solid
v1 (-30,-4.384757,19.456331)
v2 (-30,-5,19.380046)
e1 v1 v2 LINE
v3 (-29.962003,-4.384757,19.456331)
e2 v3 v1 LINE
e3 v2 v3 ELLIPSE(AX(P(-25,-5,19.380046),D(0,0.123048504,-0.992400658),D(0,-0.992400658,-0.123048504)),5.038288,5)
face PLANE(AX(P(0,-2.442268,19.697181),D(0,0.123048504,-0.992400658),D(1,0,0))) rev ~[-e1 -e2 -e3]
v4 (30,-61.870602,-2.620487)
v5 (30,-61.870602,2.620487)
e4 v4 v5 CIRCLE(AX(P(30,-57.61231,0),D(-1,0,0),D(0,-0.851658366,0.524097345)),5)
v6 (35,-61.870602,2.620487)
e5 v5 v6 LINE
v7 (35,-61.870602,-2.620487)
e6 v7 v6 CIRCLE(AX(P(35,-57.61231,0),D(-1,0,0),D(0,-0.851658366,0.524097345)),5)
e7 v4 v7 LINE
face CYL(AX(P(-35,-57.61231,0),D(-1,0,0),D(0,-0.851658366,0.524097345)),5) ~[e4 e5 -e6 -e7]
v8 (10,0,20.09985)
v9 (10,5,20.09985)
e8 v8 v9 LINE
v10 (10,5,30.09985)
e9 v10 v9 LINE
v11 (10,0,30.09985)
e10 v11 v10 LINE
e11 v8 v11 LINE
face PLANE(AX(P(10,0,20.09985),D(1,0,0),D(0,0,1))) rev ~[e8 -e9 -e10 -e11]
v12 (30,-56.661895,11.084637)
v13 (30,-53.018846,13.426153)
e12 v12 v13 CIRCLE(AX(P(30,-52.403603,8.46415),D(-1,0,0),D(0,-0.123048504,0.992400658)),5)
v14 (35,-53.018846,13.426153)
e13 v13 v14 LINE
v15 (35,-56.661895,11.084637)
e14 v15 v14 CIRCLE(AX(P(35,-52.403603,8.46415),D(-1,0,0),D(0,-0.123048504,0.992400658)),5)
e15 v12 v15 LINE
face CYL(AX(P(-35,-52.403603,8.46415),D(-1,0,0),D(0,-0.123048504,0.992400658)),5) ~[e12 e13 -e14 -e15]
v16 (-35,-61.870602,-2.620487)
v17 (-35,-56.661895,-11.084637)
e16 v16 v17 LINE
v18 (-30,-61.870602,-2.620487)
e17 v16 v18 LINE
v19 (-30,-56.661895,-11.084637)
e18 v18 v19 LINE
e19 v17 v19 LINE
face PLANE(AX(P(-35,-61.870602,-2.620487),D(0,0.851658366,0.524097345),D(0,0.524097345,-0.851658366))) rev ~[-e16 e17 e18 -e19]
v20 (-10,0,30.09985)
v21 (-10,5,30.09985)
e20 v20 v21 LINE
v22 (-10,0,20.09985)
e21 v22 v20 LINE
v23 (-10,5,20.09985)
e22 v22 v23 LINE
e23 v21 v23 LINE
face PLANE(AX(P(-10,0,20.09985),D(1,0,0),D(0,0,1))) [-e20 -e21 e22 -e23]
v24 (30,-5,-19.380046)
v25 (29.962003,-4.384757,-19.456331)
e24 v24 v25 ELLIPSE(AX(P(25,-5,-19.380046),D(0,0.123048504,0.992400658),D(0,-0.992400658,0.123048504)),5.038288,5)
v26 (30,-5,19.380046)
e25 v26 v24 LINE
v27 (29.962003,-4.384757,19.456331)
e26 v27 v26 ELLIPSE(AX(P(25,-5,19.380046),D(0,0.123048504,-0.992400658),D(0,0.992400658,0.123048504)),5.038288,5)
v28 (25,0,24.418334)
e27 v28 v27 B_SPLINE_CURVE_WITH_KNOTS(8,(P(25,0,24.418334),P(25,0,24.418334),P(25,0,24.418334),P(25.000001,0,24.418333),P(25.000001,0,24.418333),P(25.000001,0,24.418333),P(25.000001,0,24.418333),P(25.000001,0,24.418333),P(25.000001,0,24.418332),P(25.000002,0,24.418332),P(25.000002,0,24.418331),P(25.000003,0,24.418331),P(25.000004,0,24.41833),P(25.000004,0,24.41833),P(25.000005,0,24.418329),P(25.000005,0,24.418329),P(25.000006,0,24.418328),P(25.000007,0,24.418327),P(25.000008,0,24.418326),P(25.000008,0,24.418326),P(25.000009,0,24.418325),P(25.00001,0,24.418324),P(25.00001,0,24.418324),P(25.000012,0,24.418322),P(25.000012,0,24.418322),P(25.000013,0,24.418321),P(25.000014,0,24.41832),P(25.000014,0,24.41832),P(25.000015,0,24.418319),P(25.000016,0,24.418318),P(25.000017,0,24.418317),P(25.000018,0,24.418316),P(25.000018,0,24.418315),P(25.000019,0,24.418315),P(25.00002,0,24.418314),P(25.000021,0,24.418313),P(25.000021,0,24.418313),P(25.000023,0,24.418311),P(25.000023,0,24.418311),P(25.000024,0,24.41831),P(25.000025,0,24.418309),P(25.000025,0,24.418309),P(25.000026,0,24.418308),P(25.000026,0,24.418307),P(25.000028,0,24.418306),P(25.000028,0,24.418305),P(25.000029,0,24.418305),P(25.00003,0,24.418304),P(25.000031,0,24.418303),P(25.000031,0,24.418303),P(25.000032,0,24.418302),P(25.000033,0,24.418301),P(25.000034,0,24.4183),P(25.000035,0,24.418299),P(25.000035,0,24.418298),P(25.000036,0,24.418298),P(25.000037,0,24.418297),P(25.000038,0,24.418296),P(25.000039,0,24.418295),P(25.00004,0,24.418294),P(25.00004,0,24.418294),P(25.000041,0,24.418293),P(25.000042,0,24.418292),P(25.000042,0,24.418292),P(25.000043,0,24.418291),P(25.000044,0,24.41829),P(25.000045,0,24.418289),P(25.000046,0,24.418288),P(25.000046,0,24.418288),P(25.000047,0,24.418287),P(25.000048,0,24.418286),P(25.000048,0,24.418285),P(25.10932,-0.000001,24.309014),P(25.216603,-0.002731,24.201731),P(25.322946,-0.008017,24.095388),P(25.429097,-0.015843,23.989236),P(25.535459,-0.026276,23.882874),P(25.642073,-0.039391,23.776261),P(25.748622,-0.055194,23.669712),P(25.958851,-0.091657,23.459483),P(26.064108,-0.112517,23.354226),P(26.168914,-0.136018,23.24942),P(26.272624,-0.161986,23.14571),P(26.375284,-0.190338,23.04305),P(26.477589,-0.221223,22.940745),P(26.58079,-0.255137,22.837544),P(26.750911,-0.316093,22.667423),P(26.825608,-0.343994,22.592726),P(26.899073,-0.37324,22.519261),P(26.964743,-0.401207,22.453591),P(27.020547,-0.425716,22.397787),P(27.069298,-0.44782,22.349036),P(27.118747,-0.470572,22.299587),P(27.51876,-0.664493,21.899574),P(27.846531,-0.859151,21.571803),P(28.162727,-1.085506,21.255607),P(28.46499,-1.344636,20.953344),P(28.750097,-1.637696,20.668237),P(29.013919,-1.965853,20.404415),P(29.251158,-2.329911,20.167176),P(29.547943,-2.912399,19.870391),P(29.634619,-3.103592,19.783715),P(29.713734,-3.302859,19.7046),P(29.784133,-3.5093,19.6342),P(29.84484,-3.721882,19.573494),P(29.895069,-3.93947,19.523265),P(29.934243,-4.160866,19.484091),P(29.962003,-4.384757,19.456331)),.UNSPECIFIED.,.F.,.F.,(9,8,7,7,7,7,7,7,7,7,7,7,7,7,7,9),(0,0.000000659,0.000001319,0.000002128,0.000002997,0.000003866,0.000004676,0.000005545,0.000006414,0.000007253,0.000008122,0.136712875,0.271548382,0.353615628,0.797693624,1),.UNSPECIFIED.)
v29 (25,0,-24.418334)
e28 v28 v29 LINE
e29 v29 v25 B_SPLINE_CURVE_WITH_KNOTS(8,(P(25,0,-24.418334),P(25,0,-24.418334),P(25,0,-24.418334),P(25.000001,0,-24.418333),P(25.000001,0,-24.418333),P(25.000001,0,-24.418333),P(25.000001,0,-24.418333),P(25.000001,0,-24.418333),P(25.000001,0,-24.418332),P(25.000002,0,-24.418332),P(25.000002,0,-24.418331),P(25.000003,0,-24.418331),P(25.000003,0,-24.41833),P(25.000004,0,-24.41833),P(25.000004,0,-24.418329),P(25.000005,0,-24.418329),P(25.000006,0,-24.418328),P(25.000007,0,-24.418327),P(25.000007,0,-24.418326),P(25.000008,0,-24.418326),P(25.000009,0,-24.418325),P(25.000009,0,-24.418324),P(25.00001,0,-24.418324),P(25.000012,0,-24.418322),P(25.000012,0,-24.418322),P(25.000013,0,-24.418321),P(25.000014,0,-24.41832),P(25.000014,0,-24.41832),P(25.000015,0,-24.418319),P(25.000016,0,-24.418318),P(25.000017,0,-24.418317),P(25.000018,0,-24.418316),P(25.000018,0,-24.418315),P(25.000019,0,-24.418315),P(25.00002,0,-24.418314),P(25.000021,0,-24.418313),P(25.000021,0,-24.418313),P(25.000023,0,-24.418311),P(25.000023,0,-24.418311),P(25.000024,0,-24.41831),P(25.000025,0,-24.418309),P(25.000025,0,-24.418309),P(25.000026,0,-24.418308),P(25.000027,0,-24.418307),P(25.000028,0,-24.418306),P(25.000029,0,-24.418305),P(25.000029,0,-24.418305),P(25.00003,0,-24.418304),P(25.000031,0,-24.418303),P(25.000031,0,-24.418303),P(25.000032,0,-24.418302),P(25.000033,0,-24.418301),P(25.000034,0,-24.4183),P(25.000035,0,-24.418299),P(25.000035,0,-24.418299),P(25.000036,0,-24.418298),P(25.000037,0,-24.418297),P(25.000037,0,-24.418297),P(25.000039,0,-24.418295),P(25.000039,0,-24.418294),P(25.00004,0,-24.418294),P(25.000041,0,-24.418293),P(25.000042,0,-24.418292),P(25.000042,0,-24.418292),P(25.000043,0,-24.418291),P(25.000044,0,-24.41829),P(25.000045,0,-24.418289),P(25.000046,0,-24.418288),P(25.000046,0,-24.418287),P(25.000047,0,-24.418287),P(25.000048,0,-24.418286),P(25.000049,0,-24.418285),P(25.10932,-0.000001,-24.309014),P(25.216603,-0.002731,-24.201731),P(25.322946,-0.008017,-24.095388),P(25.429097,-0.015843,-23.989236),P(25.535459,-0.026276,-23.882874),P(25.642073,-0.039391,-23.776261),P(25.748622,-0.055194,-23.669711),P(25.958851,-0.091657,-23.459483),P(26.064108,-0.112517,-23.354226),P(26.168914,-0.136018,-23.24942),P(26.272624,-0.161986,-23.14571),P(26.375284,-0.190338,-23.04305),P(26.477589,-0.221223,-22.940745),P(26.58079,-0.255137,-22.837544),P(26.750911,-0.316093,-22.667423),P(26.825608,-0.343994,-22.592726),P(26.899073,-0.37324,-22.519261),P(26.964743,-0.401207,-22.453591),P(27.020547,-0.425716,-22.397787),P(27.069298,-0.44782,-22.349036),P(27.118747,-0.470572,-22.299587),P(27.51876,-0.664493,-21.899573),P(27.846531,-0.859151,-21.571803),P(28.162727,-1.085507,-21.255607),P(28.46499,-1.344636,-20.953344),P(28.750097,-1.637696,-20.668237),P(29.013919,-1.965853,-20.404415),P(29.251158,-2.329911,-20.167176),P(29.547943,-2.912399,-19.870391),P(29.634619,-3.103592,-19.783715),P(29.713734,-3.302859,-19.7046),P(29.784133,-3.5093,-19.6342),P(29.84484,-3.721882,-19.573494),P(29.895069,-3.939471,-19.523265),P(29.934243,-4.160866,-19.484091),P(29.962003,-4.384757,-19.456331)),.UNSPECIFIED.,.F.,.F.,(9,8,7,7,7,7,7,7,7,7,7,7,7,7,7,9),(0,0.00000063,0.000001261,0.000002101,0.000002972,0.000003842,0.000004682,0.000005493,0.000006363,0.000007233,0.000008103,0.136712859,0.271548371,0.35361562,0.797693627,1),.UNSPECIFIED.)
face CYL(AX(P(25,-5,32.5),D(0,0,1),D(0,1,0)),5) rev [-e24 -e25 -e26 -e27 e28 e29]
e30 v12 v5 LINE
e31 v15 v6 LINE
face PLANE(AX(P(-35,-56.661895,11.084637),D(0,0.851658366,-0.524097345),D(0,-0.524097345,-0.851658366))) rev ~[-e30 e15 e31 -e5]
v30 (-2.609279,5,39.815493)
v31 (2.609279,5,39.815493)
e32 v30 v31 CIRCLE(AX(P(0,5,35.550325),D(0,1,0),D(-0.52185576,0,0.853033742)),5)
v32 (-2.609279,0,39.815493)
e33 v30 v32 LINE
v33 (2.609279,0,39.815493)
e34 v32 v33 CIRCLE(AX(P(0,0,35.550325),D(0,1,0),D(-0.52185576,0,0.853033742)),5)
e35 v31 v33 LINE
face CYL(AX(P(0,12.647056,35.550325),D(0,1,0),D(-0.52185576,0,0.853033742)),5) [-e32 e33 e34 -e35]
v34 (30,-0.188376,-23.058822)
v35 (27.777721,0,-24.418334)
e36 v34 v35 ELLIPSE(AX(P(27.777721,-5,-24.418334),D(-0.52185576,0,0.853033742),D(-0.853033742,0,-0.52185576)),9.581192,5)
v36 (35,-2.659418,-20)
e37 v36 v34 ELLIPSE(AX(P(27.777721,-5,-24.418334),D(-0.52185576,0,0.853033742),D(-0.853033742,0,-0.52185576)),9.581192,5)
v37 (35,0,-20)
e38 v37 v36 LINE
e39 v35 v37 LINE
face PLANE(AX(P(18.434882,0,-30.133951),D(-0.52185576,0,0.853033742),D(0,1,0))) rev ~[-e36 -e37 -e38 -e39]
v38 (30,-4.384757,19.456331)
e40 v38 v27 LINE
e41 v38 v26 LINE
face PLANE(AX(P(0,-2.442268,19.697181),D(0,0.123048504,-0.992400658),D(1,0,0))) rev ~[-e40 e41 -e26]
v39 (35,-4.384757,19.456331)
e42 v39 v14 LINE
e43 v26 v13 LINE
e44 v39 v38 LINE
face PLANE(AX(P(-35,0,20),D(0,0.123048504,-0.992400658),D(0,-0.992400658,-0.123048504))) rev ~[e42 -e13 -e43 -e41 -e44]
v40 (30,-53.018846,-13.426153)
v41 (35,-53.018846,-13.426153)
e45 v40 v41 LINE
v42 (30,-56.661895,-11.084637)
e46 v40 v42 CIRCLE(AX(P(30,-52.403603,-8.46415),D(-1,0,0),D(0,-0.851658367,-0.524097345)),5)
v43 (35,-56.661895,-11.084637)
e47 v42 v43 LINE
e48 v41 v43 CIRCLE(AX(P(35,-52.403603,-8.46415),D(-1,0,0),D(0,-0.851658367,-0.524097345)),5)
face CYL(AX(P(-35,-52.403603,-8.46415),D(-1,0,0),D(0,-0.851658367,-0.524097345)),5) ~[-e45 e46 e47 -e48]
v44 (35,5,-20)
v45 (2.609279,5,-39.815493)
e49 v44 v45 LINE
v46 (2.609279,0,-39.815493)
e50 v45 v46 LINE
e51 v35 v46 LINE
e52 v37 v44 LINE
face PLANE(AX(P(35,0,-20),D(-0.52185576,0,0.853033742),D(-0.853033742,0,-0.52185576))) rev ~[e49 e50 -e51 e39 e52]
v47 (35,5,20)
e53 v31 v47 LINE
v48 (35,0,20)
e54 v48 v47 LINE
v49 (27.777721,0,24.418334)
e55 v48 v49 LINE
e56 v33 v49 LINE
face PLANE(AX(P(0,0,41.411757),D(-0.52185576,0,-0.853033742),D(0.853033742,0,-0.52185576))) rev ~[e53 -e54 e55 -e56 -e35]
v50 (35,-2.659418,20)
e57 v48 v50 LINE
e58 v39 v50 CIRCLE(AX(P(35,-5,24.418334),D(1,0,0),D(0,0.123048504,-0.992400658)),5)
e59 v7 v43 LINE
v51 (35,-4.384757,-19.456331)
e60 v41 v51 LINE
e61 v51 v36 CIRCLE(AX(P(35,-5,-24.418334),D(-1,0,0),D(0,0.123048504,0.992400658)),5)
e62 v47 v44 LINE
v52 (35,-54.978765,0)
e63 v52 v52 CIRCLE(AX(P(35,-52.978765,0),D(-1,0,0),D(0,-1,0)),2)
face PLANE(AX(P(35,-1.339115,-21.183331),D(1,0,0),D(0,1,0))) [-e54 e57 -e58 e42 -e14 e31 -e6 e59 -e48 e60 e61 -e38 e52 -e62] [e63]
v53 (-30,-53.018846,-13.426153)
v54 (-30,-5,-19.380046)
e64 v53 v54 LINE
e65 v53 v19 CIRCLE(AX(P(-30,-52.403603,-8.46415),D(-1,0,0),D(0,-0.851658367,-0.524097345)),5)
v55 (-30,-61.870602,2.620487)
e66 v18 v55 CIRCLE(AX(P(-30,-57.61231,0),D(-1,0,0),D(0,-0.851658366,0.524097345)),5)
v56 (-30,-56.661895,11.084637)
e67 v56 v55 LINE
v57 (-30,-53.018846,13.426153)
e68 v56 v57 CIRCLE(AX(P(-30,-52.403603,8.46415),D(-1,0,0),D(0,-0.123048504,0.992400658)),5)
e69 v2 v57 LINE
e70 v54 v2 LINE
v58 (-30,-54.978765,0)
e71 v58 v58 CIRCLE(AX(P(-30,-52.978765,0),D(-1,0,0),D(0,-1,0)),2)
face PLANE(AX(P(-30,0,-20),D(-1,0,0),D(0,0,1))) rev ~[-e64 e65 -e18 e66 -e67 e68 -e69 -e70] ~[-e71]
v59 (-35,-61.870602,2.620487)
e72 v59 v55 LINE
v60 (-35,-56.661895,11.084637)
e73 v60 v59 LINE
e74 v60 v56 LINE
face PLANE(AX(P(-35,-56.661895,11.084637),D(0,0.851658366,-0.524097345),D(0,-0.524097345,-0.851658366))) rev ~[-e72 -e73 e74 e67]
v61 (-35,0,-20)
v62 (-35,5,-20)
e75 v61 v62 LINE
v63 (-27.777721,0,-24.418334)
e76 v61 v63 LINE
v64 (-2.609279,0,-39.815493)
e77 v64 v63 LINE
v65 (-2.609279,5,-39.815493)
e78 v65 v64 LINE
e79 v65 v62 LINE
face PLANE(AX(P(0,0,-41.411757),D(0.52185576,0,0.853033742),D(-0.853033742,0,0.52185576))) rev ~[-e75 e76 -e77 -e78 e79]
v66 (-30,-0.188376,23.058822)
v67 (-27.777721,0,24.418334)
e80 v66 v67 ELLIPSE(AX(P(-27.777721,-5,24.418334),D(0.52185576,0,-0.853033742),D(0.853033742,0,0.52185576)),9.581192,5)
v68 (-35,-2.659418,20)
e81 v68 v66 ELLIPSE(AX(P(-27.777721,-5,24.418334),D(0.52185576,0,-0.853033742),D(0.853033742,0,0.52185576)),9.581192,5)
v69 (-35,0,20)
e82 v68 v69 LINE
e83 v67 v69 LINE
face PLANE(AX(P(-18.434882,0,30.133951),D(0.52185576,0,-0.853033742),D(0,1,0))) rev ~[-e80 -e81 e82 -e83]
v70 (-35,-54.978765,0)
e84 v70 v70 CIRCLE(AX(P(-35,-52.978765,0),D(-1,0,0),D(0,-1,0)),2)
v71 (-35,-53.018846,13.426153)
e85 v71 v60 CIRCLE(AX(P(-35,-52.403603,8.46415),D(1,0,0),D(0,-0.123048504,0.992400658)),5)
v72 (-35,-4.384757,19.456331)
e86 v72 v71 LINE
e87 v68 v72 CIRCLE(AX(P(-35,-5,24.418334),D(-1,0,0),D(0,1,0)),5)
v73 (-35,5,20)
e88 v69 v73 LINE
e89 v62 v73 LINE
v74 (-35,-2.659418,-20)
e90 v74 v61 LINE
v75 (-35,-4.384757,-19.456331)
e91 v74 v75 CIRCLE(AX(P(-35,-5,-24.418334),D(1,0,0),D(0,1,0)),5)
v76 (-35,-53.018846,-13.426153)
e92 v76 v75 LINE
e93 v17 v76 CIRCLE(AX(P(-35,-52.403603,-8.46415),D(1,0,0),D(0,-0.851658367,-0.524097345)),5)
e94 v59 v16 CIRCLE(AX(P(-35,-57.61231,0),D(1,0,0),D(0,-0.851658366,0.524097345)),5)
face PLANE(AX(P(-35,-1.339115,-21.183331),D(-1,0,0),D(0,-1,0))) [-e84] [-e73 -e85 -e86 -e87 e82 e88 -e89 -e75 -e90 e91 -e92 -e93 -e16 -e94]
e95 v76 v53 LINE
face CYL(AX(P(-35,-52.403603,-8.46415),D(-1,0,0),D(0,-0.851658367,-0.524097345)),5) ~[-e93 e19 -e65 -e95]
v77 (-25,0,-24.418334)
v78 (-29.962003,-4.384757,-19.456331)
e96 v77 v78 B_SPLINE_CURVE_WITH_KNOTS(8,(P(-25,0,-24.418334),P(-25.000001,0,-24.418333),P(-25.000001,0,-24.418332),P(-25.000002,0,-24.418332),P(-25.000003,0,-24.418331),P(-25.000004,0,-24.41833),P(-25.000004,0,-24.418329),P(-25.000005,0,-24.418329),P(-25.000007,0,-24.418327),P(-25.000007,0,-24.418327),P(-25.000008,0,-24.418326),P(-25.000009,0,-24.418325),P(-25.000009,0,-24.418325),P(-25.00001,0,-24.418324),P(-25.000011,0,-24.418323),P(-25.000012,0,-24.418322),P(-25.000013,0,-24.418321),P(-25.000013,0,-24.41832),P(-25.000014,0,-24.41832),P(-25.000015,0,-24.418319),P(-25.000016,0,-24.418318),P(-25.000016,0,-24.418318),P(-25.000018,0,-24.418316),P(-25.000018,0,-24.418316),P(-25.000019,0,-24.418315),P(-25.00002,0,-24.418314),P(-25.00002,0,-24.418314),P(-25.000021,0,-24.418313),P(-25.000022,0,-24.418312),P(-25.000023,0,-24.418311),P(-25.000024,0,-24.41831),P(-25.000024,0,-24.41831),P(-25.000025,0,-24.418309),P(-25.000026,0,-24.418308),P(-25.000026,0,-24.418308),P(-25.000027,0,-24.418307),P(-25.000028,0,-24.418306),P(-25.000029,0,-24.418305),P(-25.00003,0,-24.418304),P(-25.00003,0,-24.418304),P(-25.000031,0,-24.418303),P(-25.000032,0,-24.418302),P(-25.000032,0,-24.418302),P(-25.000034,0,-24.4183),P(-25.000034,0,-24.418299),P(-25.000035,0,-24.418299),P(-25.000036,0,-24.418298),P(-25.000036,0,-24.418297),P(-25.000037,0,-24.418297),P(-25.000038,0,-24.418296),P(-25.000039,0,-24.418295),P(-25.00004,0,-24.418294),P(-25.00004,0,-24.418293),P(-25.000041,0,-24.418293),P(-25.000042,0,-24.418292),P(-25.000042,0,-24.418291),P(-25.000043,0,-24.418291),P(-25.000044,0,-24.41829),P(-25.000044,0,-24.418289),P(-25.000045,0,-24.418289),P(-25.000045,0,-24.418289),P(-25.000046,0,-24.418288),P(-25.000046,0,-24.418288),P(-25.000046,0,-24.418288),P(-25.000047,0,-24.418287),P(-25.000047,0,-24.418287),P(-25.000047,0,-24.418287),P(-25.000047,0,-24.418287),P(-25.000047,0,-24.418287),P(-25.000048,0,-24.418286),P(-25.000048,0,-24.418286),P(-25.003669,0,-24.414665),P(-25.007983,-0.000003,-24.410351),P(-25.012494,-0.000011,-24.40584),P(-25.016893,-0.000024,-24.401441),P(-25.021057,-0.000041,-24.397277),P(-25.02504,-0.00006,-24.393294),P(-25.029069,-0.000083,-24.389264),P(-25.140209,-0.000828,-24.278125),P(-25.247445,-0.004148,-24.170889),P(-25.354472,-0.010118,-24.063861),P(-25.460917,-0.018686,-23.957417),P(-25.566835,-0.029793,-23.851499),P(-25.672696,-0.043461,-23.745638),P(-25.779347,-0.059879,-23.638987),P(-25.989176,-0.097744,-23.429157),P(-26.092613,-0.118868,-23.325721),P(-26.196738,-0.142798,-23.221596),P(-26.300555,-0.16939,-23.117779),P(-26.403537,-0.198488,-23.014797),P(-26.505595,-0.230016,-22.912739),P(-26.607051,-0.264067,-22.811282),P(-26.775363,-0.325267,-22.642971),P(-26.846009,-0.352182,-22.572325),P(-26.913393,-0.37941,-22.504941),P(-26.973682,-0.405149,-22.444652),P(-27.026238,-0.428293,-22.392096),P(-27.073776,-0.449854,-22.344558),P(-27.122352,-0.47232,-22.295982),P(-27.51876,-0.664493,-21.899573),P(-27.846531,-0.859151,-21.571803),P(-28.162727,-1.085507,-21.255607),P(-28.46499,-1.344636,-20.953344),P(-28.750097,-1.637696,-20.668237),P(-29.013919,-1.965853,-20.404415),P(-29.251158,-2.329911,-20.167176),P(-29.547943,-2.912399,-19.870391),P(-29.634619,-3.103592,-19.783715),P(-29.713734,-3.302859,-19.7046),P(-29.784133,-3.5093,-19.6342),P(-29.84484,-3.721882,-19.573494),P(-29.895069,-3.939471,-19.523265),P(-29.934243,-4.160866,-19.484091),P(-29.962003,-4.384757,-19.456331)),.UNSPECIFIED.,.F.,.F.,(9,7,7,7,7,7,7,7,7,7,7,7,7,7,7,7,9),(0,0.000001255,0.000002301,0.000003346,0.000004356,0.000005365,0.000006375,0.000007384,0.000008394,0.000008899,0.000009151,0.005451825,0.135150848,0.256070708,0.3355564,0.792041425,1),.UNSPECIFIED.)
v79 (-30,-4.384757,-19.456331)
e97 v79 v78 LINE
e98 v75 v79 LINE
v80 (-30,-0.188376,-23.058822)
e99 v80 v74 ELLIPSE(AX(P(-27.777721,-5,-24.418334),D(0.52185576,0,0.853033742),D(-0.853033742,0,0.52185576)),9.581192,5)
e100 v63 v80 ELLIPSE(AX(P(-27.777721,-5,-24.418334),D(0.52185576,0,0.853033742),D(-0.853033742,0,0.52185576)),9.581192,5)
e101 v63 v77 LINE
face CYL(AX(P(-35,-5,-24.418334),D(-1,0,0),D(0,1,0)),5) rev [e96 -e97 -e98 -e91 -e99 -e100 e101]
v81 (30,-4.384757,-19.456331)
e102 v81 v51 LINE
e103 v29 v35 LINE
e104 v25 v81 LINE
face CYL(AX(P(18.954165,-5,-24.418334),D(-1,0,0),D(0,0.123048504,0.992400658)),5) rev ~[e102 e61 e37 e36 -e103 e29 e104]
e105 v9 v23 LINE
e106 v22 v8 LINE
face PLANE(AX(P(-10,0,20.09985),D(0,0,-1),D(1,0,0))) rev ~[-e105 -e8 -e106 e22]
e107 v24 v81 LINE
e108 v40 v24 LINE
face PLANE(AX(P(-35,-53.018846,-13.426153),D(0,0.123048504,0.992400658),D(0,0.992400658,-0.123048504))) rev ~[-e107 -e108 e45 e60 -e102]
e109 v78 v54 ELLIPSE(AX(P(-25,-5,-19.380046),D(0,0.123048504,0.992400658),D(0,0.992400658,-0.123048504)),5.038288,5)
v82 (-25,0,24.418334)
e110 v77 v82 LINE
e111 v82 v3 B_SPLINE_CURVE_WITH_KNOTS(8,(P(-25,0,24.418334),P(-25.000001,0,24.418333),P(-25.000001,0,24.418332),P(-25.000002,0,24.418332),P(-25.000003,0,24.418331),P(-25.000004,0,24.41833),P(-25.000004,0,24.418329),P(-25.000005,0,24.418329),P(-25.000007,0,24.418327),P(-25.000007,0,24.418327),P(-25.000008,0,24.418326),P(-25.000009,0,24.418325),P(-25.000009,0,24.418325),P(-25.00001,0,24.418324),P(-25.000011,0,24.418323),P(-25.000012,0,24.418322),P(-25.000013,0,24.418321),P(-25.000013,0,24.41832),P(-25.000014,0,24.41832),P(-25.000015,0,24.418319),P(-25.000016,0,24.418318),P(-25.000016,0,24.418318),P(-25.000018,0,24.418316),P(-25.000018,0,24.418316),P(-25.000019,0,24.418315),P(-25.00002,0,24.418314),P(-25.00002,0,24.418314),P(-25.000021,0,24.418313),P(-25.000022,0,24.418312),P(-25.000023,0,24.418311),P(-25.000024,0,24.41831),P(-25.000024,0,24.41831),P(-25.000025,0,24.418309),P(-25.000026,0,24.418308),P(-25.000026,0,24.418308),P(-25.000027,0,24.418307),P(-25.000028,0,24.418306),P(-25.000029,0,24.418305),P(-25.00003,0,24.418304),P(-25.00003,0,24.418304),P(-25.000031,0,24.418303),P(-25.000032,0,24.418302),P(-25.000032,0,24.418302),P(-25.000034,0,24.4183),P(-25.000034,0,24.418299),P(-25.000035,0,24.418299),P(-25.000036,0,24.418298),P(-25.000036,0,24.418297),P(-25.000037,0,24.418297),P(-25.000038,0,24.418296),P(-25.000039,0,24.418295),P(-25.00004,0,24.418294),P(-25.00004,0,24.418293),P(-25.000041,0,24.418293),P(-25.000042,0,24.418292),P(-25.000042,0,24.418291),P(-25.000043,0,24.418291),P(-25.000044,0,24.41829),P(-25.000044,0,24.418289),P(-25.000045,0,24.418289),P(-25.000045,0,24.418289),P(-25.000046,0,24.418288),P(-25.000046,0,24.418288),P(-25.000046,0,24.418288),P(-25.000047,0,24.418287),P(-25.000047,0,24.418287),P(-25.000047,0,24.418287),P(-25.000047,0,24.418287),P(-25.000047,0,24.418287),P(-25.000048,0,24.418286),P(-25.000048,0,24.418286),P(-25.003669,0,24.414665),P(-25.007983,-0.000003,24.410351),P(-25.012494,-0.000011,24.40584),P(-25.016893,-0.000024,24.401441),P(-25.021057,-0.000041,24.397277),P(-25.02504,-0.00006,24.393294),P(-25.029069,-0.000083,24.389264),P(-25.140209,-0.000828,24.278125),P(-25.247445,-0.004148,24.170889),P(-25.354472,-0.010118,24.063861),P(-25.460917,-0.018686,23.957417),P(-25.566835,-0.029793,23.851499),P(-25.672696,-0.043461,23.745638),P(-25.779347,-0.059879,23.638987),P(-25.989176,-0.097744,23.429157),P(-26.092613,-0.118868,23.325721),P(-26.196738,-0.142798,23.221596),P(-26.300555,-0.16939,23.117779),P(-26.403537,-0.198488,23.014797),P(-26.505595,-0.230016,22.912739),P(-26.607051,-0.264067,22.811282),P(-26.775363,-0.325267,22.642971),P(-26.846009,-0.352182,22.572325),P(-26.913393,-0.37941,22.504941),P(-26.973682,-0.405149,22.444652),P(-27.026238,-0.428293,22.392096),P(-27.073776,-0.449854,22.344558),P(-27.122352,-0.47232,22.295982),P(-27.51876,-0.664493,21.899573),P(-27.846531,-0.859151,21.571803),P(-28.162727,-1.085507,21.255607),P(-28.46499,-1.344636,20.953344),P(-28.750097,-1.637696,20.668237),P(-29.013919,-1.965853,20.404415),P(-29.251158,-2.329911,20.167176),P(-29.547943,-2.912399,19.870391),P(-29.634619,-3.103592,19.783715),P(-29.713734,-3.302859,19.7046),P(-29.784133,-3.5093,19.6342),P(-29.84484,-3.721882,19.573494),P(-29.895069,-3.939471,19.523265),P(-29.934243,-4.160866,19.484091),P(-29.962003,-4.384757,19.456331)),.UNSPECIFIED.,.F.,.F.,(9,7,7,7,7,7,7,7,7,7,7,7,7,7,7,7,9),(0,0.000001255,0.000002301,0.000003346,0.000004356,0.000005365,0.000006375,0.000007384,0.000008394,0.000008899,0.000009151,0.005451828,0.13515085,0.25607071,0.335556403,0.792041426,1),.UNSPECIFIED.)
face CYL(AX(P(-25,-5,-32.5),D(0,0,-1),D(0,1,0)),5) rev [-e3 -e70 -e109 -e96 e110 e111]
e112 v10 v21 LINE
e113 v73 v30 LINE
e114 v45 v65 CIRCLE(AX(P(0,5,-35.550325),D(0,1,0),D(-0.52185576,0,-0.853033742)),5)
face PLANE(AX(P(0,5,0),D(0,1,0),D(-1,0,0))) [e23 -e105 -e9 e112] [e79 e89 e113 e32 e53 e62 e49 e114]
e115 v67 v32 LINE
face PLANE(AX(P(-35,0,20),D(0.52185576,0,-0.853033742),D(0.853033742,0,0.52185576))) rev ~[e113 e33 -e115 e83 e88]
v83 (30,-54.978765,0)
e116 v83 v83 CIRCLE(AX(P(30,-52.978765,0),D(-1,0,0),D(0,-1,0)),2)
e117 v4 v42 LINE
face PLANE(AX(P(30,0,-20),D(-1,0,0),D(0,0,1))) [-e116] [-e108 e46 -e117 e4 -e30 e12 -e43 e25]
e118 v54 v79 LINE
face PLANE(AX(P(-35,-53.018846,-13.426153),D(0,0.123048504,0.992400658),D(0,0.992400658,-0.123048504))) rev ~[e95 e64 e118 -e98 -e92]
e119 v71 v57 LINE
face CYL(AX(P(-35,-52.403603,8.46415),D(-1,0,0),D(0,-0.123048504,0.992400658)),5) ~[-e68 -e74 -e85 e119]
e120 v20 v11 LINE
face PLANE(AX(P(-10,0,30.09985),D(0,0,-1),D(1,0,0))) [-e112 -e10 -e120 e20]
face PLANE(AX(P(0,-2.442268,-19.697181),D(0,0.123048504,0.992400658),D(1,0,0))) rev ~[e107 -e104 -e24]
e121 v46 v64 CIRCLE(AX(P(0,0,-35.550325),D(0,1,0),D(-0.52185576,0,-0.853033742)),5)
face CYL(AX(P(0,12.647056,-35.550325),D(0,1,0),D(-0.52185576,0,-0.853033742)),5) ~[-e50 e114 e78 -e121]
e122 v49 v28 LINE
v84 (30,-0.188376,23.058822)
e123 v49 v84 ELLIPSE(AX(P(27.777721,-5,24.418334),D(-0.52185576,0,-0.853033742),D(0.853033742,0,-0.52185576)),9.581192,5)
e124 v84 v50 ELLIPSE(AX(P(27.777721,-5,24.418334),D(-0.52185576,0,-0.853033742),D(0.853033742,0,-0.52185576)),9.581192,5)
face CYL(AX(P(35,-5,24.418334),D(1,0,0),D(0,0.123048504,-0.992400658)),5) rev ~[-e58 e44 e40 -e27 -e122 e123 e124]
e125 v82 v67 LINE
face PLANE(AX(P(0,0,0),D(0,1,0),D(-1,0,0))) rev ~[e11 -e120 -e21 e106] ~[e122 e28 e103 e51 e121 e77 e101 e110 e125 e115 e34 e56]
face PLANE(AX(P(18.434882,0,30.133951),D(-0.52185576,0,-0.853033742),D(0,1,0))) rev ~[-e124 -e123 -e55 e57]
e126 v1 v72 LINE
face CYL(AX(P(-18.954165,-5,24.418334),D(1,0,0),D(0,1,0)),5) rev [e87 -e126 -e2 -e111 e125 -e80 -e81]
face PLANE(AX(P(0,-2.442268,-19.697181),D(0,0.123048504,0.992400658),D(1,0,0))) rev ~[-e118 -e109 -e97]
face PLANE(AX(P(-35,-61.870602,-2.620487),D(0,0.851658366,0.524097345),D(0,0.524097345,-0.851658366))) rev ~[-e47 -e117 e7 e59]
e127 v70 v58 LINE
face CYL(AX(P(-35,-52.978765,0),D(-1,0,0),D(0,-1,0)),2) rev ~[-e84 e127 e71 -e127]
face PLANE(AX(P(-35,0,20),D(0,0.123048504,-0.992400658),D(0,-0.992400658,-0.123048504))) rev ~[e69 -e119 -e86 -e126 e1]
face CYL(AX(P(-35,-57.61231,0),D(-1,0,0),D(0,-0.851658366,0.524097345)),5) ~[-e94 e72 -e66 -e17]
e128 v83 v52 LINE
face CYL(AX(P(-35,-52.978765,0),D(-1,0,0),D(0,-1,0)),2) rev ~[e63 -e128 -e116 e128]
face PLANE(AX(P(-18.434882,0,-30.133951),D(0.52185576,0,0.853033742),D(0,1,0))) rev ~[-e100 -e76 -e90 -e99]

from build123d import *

# Parameters (mm, degrees)
F0_W         = 5
F0_H         = 40
F1_DEPTH     = 70
F3_DEPTH     = 5
F4_R         = 2
F5_DEPTH     = 97.2
F7_DEPTH     = 83.6
F8_T4_DEPTH  = 65
F8_T10_DEPTH = 65
F8_T16_DEPTH = 5
F8_T21_DEPTH = 5
F8_T26_DEPTH = 5
F8_T31_DEPTH = 5
F8_T37_DEPTH = 16.0458347789
F8_T42_DEPTH = 65
F8_T50_DEPTH = 16.0458347789
F8_T55_DEPTH = 65
F8_T63_DEPTH = 16.0458347789
F8_T68_DEPTH = 65
F8_T76_DEPTH = 65
F8_T81_DEPTH = 16.0458347789
F8_T85_DEPTH = 20.294112478
F9_W         = 20
F9_H         = 10
F10_DEPTH    = 25


# Not quite as in the source:
# - a fillet or chamfer that OpenCascade refuses, or shapes differently, is made with other operations: its cross-section is extruded or revolved along the edge and cut away or added


with BuildPart() as f1:
    # F0 (on Front) → F1 (new body)
    with BuildSketch(Plane.XZ):
        with Locations((-32.5, 0)):
            Rectangle(F0_W, F0_H)
    extrude(amount=F1_DEPTH)



with BuildPart() as f1b:
    # F0 (on Front) → F1, piece 2 (new body)
    with BuildSketch(Plane.XZ):
        with Locations((32.5, 0)):
            Rectangle(F0_W, F0_H)
    extrude(amount=F1_DEPTH)


with BuildPart() as f1_1:
    add(f1.part)

    add(f1b.part)  # F3 merges F1b
    # F2 (on face) → F3 (join)
    with BuildSketch(Plane(origin=(0, 0, 0), x_dir=(-1, 0, 0), z_dir=(0, 1, 0))):
        Polygon((-35, -20), (0, -41.4117574692), (35, -20), (35, 20), (0, 41.4117574692), (-35, 20), align=None)
    extrude(amount=F3_DEPTH)

    # F4 (on face) → F5 (cut)
    with BuildSketch(Plane(origin=(-35, 0, 0), x_dir=(0, -1, 0), z_dir=(-1, 0, 0))):
        with Locations((52.9787652194, 0)):
            Circle(F4_R)
    extrude(amount=-F5_DEPTH, mode=Mode.SUBTRACT)

    # F6 (on face) → F7 (cut)
    with BuildSketch(Plane(origin=(-35, 0, 0), x_dir=(0, -1, 0), z_dir=(-1, 0, 0))):
        with BuildLine():
            Line((98.4306931496, 40.8057309687), (0, 20))
            Line((0, 20), (53.01884554, 13.4261534673))
            ThreePointArc((53.01884554, 13.4261534673), (55.107028482, 12.6702755654), (56.6618948527, 11.084636902))
            Line((56.6618948527, 11.084636902), (61.8706015463, 2.6204867239))
            ThreePointArc((61.8706015463, 2.6204867239), (62.6123097139, 0), (61.8706015463, -2.6204867239))
            Line((61.8706015463, -2.6204867239), (56.6618948527, -11.084636902))
            ThreePointArc((56.6618948527, -11.084636902), (55.107028482, -12.6702755654), (53.01884554, -13.4261534673))
            Line((53.01884554, -13.4261534673), (0, -20))
            Line((0, -20), (98.4306931496, -42.0177839696))
            Line((98.4306931496, -42.0177839696), (98.4306931496, 40.8057309687))
        make_face()
    extrude(amount=-F7_DEPTH, mode=Mode.SUBTRACT)

    # F8: fillet of radius 5 on 8 edges, made by hand


with BuildPart() as f8_tool2:
    # F8_s3 → F8_t4 (new body)
    with BuildSketch(Plane.XY.offset(32.5)):
        with BuildLine():
            ThreePointArc((25, 0), (28.5355339059, -1.4644660941), (30, -5))
            Line((30, -5), (30, 0))
            Line((30, 0), (25, 0))
        make_face()
    extrude(amount=-F8_T4_DEPTH)

    split(bisect_by=Plane(origin=(0, -2.4422683248, 19.6971813136), x_dir=(1, 0, 0), z_dir=(0, 0.1230485039, -0.9924006578)), keep=Keep.TOP)

    split(bisect_by=Plane(origin=(0, -2.4422683248, -19.6971813136), x_dir=(1, 0, 0), z_dir=(0, 0.1230485039, 0.9924006578)), keep=Keep.TOP)


with BuildPart() as f1_2:
    add(f1_1.part)

    # F8_t1: union F8_tool2
    add(f8_tool2.part)


with BuildPart() as f8_tool8:
    # F8_s9 → F8_t10 (new body)
    with BuildSketch(Plane.XY.offset(-32.5)):
        with BuildLine():
            ThreePointArc((-25, 0), (-28.5355339059, -1.4644660941), (-30, -5))
            Line((-30, -5), (-30, 0))
            Line((-30, 0), (-25, 0))
        make_face()
    extrude(amount=F8_T10_DEPTH)

    split(bisect_by=Plane(origin=(0, -2.4422683248, -19.6971813136), x_dir=(1, 0, 0), z_dir=(0, 0.1230485039, 0.9924006578)), keep=Keep.TOP)

    split(bisect_by=Plane(origin=(0, -2.4422683248, 19.6971813136), x_dir=(1, 0, 0), z_dir=(0, 0.1230485039, -0.9924006578)), keep=Keep.TOP)


with BuildPart() as f1_3:
    add(f1_2.part)

    # F8_t7: union F8_tool8
    add(f8_tool8.part)


with BuildPart() as f8_tool14:
    # F8_s15 → F8_t16 (new body)
    with BuildSketch(Plane.YZ.offset(35)):
        with BuildLine():
            ThreePointArc((-4.3847574804, 19.4563306223), (-1.2532539052, 21.1074588458), (0, 24.4183339115))
            Line((0, 24.4183339115), (0, 20))
            Line((0, 20), (-4.3847574804, 19.4563306223))
        make_face()
    extrude(amount=-F8_T16_DEPTH)

    split(bisect_by=Plane(origin=(18.4348816442, 0, 30.1339513338), x_dir=(0, 1, 0), z_dir=(-0.5218557601, 0, -0.8530337424)), keep=Keep.TOP)


with BuildPart() as f1_4:
    add(f1_3.part)

    # F8_t13: union F8_tool14
    add(f8_tool14.part)


with BuildPart() as f8_tool19:
    # F8_s20 → F8_t21 (new body)
    with BuildSketch(Plane.YZ.offset(-30)):
        with BuildLine():
            ThreePointArc((0, 24.4183339115), (-1.2532539052, 21.1074588458), (-4.3847574804, 19.4563306223))
            Line((-4.3847574804, 19.4563306223), (0, 20))
            Line((0, 20), (0, 24.4183339115))
        make_face()
    extrude(amount=-F8_T21_DEPTH)

    split(bisect_by=Plane(origin=(-18.4348816442, 0, 30.1339513338), x_dir=(0, 1, 0), z_dir=(0.5218557601, 0, -0.8530337424)), keep=Keep.TOP)


with BuildPart() as f1_5:
    add(f1_4.part)

    # F8_t18: union F8_tool19
    add(f8_tool19.part)


with BuildPart() as f8_tool24:
    # F8_s25 → F8_t26 (new body)
    with BuildSketch(Plane.YZ.offset(-35)):
        with BuildLine():
            ThreePointArc((0, -24.4183339115), (-1.2532539052, -21.1074588458), (-4.3847574804, -19.4563306223))
            Line((-4.3847574804, -19.4563306223), (0, -20))
            Line((0, -20), (0, -24.4183339115))
        make_face()
    extrude(amount=F8_T26_DEPTH)

    split(bisect_by=Plane(origin=(-18.4348816442, 0, -30.1339513338), x_dir=(0, 1, 0), z_dir=(0.5218557601, 0, 0.8530337424)), keep=Keep.TOP)


with BuildPart() as f1_6:
    add(f1_5.part)

    # F8_t23: union F8_tool24
    add(f8_tool24.part)


with BuildPart() as f8_tool29:
    # F8_s30 → F8_t31 (new body)
    with BuildSketch(Plane.YZ.offset(30)):
        with BuildLine():
            ThreePointArc((-4.3847574804, -19.4563306223), (-1.2532539052, -21.1074588458), (0, -24.4183339115))
            Line((0, -24.4183339115), (0, -20))
            Line((0, -20), (-4.3847574804, -19.4563306223))
        make_face()
    extrude(amount=F8_T31_DEPTH)

    split(bisect_by=Plane(origin=(18.4348816442, 0, -30.1339513338), x_dir=(0, 1, 0), z_dir=(-0.5218557601, 0, 0.8530337424)), keep=Keep.TOP)


with BuildPart() as f1_7:
    add(f1_6.part)

    # F8_t28: union F8_tool29
    add(f8_tool29.part)


with BuildPart() as f8_tool35:
    # F8_s36 → F8_t37 (new body)
    with BuildSketch(Plane.YZ.offset(35)):
        with BuildLine():
            ThreePointArc((-4.3847574804, 19.4563306223), (-1.2532539052, 21.1074588458), (0, 24.4183339115))
            Line((0, 24.4183339115), (0, 20))
            Line((0, 20), (-4.3847574804, 19.4563306223))
        make_face()
    extrude(amount=-F8_T37_DEPTH)

    split(bisect_by=Plane(origin=(18.4348816442, 0, 30.1339513338), x_dir=(0, 1, 0), z_dir=(-0.5218557601, 0, -0.8530337424)), keep=Keep.TOP)

    split(bisect_by=Plane.YZ.offset(30), keep=Keep.BOTTOM)


with BuildPart() as f8_tool40:
    # F8_s41 → F8_t42 (new body)
    with BuildSketch(Plane.XY.offset(32.5)):
        with BuildLine():
            ThreePointArc((25, 0), (28.5355339059, -1.4644660941), (30, -5))
            Line((30, -5), (30, 0))
            Line((30, 0), (25, 0))
        make_face()
    extrude(amount=-F8_T42_DEPTH)

    split(bisect_by=Plane(origin=(18.4348816442, 0, 30.1339513338), x_dir=(0, 1, 0), z_dir=(-0.5218557601, 0, -0.8530337424)), keep=Keep.TOP)

    split(bisect_by=Plane(origin=(0, -2.4422683248, 19.6971813136), x_dir=(1, 0, 0), z_dir=(0, -0.1230485039, 0.9924006578)), keep=Keep.TOP)


with BuildPart() as f8_tool35_1:
    add(f8_tool35.part)

    # F8_t45: intersect F8_tool40
    add(f8_tool40.part, mode=Mode.INTERSECT)


with BuildPart() as f1_8:
    add(f1_7.part)

    # F8_t33: union F8_tool35
    add(f8_tool35_1.part)


with BuildPart() as f8_tool48:
    # F8_s49 → F8_t50 (new body)
    with BuildSketch(Plane.YZ.offset(18.9541652211)):
        with BuildLine():
            ThreePointArc((-4.3847574804, -19.4563306223), (-1.2532539052, -21.1074588458), (0, -24.4183339115))
            Line((0, -24.4183339115), (0, -20))
            Line((0, -20), (-4.3847574804, -19.4563306223))
        make_face()
    extrude(amount=F8_T50_DEPTH)

    split(bisect_by=Plane(origin=(18.4348816442, 0, -30.1339513338), x_dir=(0, 1, 0), z_dir=(-0.5218557601, 0, 0.8530337424)), keep=Keep.TOP)

    split(bisect_by=Plane.YZ.offset(30), keep=Keep.BOTTOM)


with BuildPart() as f8_tool53:
    # F8_s54 → F8_t55 (new body)
    with BuildSketch(Plane.XY.offset(32.5)):
        with BuildLine():
            ThreePointArc((25, 0), (28.5355339059, -1.4644660941), (30, -5))
            Line((30, -5), (30, 0))
            Line((30, 0), (25, 0))
        make_face()
    extrude(amount=-F8_T55_DEPTH)

    split(bisect_by=Plane(origin=(18.4348816442, 0, -30.1339513338), x_dir=(0, 1, 0), z_dir=(-0.5218557601, 0, 0.8530337424)), keep=Keep.TOP)

    split(bisect_by=Plane(origin=(0, -2.4422683248, -19.6971813136), x_dir=(1, 0, 0), z_dir=(0, -0.1230485039, -0.9924006578)), keep=Keep.TOP)


with BuildPart() as f8_tool48_1:
    add(f8_tool48.part)

    # F8_t58: intersect F8_tool53
    add(f8_tool53.part, mode=Mode.INTERSECT)


with BuildPart() as f1_9:
    add(f1_8.part)

    # F8_t46: union F8_tool48
    add(f8_tool48_1.part)


with BuildPart() as f8_tool61:
    # F8_s62 → F8_t63 (new body)
    with BuildSketch(Plane.YZ.offset(-35)):
        with BuildLine():
            ThreePointArc((0, -24.4183339115), (-1.2532539052, -21.1074588458), (-4.3847574804, -19.4563306223))
            Line((-4.3847574804, -19.4563306223), (0, -20))
            Line((0, -20), (0, -24.4183339115))
        make_face()
    extrude(amount=F8_T63_DEPTH)

    split(bisect_by=Plane(origin=(-18.4348816442, 0, -30.1339513338), x_dir=(0, 1, 0), z_dir=(0.5218557601, 0, 0.8530337424)), keep=Keep.TOP)

    split(bisect_by=Plane.YZ.offset(-30), keep=Keep.TOP)


with BuildPart() as f8_tool66:
    # F8_s67 → F8_t68 (new body)
    with BuildSketch(Plane.XY.offset(-32.5)):
        with BuildLine():
            ThreePointArc((-25, 0), (-28.5355339059, -1.4644660941), (-30, -5))
            Line((-30, -5), (-30, 0))
            Line((-30, 0), (-25, 0))
        make_face()
    extrude(amount=F8_T68_DEPTH)

    split(bisect_by=Plane(origin=(-18.4348816442, 0, -30.1339513338), x_dir=(0, 1, 0), z_dir=(0.5218557601, 0, 0.8530337424)), keep=Keep.TOP)

    split(bisect_by=Plane(origin=(0, -2.4422683248, -19.6971813136), x_dir=(1, 0, 0), z_dir=(0, -0.1230485039, -0.9924006578)), keep=Keep.TOP)


with BuildPart() as f8_tool61_1:
    add(f8_tool61.part)

    # F8_t71: intersect F8_tool66
    add(f8_tool66.part, mode=Mode.INTERSECT)


with BuildPart() as f1_10:
    add(f1_9.part)

    # F8_t59: union F8_tool61
    add(f8_tool61_1.part)


with BuildPart() as f8_tool74:
    # F8_s75 → F8_t76 (new body)
    with BuildSketch(Plane.XY.offset(-32.5)):
        with BuildLine():
            ThreePointArc((-25, 0), (-28.5355339059, -1.4644660941), (-30, -5))
            Line((-30, -5), (-30, 0))
            Line((-30, 0), (-25, 0))
        make_face()
    extrude(amount=F8_T76_DEPTH)

    split(bisect_by=Plane(origin=(-18.4348816442, 0, 30.1339513338), x_dir=(0, 1, 0), z_dir=(0.5218557601, 0, -0.8530337424)), keep=Keep.TOP)

    split(bisect_by=Plane(origin=(0, -2.4422683248, 19.6971813136), x_dir=(1, 0, 0), z_dir=(0, -0.1230485039, 0.9924006578)), keep=Keep.TOP)


with BuildPart() as f8_tool79:
    # F8_s80 → F8_t81 (new body)
    with BuildSketch(Plane.YZ.offset(-18.9541652211)):
        with BuildLine():
            ThreePointArc((0, 24.4183339115), (-1.2532539052, 21.1074588458), (-4.3847574804, 19.4563306223))
            Line((-4.3847574804, 19.4563306223), (0, 20))
            Line((0, 20), (0, 24.4183339115))
        make_face()
    extrude(amount=-F8_T81_DEPTH)

    split(bisect_by=Plane(origin=(-18.4348816442, 0, 30.1339513338), x_dir=(0, 1, 0), z_dir=(0.5218557601, 0, -0.8530337424)), keep=Keep.TOP)

    split(bisect_by=Plane.YZ.offset(-30), keep=Keep.TOP)


with BuildPart() as f8_tool74_1:
    add(f8_tool74.part)

    # F8_t84: intersect F8_tool79
    add(f8_tool79.part, mode=Mode.INTERSECT)


with BuildPart() as f1_11:
    add(f1_10.part)

    # F8_t72: union F8_tool74
    add(f8_tool74_1.part)

    # F8_s86 → F8_t85 (cut)
    with BuildSketch(Plane.XZ.offset(-12.647056239)):
        with BuildLine():
            ThreePointArc((-2.6092788007, 39.8154933306), (0, 40.5503246188), (2.6092788007, 39.8154933306))
            Line((2.6092788007, 39.8154933306), (0, 41.4117574692))
            Line((0, 41.4117574692), (-2.6092788007, 39.8154933306))
        make_face()
        with BuildLine():
            ThreePointArc((-2.6092788007, -39.8154933306), (0, -40.5503246188), (2.6092788007, -39.8154933306))
            Line((2.6092788007, -39.8154933306), (0, -41.4117574692))
            Line((0, -41.4117574692), (-2.6092788007, -39.8154933306))
        make_face()
    extrude(amount=F8_T85_DEPTH, mode=Mode.SUBTRACT)

    # F9 (on face) → F10 (cut)
    with BuildSketch(Plane.XZ):
        with Locations((0, 25.0998503715)):
            Rectangle(F9_W, F9_H)
    extrude(amount=-F10_DEPTH, mode=Mode.SUBTRACT)


solid = f1_11.part
